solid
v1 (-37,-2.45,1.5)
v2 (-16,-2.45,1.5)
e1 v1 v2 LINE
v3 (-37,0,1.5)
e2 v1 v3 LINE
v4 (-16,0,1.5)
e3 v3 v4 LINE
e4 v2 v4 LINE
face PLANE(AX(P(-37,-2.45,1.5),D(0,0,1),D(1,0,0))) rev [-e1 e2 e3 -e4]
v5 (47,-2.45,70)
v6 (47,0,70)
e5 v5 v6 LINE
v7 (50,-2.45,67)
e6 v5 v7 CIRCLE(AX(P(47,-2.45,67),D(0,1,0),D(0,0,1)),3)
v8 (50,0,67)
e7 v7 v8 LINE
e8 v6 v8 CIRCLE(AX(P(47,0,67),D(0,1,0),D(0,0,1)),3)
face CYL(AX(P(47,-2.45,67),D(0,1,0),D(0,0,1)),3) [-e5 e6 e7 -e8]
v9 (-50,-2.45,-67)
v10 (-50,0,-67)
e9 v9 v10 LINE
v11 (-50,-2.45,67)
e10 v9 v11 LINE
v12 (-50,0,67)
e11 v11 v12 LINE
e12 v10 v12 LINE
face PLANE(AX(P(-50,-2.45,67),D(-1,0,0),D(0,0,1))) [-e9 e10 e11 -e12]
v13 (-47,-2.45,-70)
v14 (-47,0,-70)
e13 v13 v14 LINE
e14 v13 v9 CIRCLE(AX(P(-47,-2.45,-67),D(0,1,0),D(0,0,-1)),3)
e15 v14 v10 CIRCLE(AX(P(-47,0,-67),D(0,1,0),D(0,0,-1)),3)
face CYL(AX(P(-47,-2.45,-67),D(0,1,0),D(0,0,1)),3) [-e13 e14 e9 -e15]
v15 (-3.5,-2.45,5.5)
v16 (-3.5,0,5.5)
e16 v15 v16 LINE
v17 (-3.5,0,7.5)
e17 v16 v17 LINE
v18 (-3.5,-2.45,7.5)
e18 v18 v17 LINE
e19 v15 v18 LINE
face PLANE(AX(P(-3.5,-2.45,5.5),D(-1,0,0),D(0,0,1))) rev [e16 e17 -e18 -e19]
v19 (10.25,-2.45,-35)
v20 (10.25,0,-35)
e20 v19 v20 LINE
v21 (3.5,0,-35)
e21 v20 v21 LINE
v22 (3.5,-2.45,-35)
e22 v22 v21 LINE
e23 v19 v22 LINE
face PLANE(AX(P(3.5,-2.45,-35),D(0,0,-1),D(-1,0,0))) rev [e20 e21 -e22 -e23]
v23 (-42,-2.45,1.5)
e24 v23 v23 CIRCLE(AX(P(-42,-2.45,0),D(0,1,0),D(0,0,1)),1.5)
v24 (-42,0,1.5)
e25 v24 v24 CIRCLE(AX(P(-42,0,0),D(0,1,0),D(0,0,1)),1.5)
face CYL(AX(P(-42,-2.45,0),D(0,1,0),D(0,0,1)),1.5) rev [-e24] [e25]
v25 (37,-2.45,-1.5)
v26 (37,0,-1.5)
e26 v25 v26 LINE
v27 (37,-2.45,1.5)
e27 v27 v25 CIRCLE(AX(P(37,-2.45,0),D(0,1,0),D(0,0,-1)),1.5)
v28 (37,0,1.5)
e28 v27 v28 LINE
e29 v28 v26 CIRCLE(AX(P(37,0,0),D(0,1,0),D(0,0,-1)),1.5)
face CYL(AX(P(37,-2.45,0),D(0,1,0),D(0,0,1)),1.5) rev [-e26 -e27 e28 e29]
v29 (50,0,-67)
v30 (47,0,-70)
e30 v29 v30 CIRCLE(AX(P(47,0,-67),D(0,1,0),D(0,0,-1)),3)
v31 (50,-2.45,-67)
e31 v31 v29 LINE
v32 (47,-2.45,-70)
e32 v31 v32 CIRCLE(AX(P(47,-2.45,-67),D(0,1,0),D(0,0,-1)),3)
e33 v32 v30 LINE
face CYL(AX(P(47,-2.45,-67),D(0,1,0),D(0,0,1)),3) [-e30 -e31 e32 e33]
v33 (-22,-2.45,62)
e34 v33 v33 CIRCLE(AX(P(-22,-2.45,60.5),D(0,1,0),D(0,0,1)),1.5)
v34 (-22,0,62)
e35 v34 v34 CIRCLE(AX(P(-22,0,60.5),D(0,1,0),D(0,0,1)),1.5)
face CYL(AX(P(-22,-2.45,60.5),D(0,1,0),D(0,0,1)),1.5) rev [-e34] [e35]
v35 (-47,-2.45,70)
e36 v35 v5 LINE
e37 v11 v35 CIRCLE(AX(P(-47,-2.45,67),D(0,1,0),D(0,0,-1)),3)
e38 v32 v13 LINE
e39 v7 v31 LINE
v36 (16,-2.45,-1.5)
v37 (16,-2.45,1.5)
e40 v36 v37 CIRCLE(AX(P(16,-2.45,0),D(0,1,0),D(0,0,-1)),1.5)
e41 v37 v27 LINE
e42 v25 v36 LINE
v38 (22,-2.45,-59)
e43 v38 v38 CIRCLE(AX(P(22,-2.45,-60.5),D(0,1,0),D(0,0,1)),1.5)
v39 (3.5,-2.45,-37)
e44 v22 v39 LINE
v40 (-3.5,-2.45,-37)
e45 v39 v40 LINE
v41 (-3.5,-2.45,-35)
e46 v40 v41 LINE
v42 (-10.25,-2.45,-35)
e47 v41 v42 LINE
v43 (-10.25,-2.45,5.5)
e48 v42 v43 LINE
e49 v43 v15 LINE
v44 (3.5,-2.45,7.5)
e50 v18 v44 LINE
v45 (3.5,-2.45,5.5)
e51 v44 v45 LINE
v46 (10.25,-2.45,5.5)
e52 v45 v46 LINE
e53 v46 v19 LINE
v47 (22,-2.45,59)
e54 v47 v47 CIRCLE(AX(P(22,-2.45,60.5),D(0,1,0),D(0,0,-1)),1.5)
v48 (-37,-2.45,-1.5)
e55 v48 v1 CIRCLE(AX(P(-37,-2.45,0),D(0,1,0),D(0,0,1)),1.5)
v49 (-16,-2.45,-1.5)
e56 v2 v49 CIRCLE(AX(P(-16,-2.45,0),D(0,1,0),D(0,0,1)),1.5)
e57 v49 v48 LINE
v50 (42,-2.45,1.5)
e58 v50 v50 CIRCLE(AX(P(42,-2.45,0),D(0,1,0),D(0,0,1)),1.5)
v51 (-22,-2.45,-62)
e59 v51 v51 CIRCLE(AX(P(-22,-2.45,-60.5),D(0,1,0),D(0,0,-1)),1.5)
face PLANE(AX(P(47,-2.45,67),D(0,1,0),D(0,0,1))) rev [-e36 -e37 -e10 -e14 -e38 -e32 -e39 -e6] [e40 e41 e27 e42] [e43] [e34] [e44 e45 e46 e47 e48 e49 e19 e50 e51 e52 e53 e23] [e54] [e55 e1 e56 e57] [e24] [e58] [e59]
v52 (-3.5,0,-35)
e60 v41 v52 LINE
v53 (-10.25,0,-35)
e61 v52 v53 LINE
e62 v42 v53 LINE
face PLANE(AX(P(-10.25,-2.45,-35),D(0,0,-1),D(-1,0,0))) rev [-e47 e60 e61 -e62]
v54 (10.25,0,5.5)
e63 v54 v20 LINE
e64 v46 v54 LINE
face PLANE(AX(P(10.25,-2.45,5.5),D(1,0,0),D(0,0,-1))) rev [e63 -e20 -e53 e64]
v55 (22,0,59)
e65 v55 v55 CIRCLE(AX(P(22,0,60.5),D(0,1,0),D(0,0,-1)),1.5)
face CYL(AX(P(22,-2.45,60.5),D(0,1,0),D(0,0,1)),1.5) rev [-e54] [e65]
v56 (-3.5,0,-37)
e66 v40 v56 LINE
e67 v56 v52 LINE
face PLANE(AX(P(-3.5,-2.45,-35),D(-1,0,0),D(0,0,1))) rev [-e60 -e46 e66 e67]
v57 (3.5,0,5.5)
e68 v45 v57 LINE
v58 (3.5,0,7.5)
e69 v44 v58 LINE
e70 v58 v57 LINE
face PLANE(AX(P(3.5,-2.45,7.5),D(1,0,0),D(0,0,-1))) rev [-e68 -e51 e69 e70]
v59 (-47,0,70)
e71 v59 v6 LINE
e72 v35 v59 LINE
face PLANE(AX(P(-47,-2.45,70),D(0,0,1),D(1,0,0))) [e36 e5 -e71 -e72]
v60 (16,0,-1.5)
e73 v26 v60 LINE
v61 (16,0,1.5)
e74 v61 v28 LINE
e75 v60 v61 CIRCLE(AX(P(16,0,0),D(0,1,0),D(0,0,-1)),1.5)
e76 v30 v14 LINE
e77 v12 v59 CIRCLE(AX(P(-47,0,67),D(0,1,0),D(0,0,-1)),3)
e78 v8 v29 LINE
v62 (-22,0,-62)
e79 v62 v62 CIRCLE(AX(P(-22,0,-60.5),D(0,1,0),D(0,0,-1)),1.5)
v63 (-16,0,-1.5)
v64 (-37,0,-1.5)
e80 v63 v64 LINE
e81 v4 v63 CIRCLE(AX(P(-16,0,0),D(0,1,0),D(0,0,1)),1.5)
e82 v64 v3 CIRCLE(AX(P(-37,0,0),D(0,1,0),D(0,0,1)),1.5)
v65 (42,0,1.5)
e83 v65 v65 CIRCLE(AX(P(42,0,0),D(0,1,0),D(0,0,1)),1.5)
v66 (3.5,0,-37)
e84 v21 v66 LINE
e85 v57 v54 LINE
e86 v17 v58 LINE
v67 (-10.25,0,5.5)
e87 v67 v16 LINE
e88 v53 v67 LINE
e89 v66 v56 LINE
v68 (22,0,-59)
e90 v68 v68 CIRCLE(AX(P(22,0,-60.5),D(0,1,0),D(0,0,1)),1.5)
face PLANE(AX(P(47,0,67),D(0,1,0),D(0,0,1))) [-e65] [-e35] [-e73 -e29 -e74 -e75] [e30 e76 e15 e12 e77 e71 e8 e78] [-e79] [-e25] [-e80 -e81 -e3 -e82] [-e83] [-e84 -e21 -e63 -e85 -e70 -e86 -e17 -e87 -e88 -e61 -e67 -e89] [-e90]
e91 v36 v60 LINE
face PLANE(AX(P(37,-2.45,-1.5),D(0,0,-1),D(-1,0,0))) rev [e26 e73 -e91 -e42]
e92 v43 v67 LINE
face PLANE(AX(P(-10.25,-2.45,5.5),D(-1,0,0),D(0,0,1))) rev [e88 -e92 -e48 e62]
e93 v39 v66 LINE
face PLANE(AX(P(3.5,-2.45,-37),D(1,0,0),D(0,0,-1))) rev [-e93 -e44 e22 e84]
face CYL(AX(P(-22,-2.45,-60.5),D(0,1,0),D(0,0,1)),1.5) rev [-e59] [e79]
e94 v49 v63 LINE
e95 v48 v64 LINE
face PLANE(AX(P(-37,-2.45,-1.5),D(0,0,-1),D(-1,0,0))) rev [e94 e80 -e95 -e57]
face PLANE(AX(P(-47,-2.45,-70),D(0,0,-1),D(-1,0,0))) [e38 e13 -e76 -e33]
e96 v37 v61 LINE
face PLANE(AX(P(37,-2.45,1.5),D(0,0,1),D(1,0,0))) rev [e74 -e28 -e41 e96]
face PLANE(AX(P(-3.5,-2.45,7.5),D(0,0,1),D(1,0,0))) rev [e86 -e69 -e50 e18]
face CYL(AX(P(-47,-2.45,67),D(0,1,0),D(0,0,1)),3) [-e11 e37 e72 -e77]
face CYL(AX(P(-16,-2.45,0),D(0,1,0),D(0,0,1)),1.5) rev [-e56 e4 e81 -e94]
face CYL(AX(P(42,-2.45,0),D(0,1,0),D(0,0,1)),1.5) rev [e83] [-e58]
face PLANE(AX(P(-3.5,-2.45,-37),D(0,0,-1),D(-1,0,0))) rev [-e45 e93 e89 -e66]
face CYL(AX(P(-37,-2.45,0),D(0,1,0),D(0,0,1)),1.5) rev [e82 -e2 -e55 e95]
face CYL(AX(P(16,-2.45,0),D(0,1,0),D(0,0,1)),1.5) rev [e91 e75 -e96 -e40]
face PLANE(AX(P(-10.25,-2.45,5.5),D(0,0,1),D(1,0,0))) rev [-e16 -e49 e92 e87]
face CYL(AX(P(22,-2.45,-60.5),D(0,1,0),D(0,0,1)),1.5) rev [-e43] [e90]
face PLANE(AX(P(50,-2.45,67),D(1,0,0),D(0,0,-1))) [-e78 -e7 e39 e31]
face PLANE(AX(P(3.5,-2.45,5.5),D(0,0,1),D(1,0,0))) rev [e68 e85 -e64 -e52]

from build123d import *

# Parameters (mm, degrees)
BASE_FLANGE2_DEPTH = 2.45
SKETCH10_R         = 1.5
CUT_EXTRUDE1_DEPTH = 2.45


# Sheet-metal steps are written as plain solids
with BuildPart() as part:
    # Sketch2 → Base-Flange2 (new body)
    with BuildSketch(Plane(origin=(0, 0, 0), x_dir=(1, 0, 0), z_dir=(0, 1, 0))):
        with BuildLine():
            Line((-47, -70), (47, -70))
            ThreePointArc((47, -70), (49.121320344, -69.121320344), (50, -67))
            Line((50, -67), (50, 67))
            ThreePointArc((50, 67), (49.121320344, 69.121320344), (47, 70))
            Line((47, 70), (-47, 70))
            ThreePointArc((-47, 70), (-49.121320344, 69.121320344), (-50, 67))
            Line((-50, 67), (-50, -67))
            ThreePointArc((-50, -67), (-49.121320344, -69.121320344), (-47, -70))
        make_face()
    extrude(amount=-BASE_FLANGE2_DEPTH)

    # Sketch10 → Cut-Extrude1 (cut)
    with BuildSketch(Plane(origin=(0, 0, 0), x_dir=(1, 0, 0), z_dir=(0, 1, 0))):
        with Locations(Location((42, 0, 0), (0, 0, 270))):
            Circle(SKETCH10_R)
        with Locations(Location((-42, 0, 0), (0, 0, 270))):
            Circle(SKETCH10_R)
        with Locations(Location((22, 60.5, 0), (0, 0, 270))):
            Circle(SKETCH10_R)
        with Locations(Location((-22, 60.5, 0), (0, 0, 90))):
            Circle(SKETCH10_R)
        with Locations(Location((22, -60.5, 0), (0, 0, 90))):
            Circle(SKETCH10_R)
        with Locations(Location((-22, -60.5, 0), (0, 0, 270))):
            Circle(SKETCH10_R)
        Polygon((-10.25, -5.5), (-3.5, -5.5), (-3.5, -7.5), (3.5, -7.5), (3.5, -5.5), (10.25, -5.5), (10.25, 35), (3.5, 35), (3.5, 37), (-3.5, 37), (-3.5, 35), (-10.25, 35), align=None)
        with BuildLine():
            Line((-37, 1.5), (-16, 1.5))
            ThreePointArc((-16, 1.5), (-14.5, 0), (-16, -1.5))
            Line((-16, -1.5), (-37, -1.5))
            ThreePointArc((-37, -1.5), (-38.5, 0), (-37, 1.5))
        make_face()
        with BuildLine():
            Line((37, 1.5), (16, 1.5))
            ThreePointArc((16, 1.5), (14.5, 0), (16, -1.5))
            Line((16, -1.5), (37, -1.5))
            ThreePointArc((37, -1.5), (38.5, 0), (37, 1.5))
        make_face()
    extrude(amount=-CUT_EXTRUDE1_DEPTH, mode=Mode.SUBTRACT)


solid = part.part
